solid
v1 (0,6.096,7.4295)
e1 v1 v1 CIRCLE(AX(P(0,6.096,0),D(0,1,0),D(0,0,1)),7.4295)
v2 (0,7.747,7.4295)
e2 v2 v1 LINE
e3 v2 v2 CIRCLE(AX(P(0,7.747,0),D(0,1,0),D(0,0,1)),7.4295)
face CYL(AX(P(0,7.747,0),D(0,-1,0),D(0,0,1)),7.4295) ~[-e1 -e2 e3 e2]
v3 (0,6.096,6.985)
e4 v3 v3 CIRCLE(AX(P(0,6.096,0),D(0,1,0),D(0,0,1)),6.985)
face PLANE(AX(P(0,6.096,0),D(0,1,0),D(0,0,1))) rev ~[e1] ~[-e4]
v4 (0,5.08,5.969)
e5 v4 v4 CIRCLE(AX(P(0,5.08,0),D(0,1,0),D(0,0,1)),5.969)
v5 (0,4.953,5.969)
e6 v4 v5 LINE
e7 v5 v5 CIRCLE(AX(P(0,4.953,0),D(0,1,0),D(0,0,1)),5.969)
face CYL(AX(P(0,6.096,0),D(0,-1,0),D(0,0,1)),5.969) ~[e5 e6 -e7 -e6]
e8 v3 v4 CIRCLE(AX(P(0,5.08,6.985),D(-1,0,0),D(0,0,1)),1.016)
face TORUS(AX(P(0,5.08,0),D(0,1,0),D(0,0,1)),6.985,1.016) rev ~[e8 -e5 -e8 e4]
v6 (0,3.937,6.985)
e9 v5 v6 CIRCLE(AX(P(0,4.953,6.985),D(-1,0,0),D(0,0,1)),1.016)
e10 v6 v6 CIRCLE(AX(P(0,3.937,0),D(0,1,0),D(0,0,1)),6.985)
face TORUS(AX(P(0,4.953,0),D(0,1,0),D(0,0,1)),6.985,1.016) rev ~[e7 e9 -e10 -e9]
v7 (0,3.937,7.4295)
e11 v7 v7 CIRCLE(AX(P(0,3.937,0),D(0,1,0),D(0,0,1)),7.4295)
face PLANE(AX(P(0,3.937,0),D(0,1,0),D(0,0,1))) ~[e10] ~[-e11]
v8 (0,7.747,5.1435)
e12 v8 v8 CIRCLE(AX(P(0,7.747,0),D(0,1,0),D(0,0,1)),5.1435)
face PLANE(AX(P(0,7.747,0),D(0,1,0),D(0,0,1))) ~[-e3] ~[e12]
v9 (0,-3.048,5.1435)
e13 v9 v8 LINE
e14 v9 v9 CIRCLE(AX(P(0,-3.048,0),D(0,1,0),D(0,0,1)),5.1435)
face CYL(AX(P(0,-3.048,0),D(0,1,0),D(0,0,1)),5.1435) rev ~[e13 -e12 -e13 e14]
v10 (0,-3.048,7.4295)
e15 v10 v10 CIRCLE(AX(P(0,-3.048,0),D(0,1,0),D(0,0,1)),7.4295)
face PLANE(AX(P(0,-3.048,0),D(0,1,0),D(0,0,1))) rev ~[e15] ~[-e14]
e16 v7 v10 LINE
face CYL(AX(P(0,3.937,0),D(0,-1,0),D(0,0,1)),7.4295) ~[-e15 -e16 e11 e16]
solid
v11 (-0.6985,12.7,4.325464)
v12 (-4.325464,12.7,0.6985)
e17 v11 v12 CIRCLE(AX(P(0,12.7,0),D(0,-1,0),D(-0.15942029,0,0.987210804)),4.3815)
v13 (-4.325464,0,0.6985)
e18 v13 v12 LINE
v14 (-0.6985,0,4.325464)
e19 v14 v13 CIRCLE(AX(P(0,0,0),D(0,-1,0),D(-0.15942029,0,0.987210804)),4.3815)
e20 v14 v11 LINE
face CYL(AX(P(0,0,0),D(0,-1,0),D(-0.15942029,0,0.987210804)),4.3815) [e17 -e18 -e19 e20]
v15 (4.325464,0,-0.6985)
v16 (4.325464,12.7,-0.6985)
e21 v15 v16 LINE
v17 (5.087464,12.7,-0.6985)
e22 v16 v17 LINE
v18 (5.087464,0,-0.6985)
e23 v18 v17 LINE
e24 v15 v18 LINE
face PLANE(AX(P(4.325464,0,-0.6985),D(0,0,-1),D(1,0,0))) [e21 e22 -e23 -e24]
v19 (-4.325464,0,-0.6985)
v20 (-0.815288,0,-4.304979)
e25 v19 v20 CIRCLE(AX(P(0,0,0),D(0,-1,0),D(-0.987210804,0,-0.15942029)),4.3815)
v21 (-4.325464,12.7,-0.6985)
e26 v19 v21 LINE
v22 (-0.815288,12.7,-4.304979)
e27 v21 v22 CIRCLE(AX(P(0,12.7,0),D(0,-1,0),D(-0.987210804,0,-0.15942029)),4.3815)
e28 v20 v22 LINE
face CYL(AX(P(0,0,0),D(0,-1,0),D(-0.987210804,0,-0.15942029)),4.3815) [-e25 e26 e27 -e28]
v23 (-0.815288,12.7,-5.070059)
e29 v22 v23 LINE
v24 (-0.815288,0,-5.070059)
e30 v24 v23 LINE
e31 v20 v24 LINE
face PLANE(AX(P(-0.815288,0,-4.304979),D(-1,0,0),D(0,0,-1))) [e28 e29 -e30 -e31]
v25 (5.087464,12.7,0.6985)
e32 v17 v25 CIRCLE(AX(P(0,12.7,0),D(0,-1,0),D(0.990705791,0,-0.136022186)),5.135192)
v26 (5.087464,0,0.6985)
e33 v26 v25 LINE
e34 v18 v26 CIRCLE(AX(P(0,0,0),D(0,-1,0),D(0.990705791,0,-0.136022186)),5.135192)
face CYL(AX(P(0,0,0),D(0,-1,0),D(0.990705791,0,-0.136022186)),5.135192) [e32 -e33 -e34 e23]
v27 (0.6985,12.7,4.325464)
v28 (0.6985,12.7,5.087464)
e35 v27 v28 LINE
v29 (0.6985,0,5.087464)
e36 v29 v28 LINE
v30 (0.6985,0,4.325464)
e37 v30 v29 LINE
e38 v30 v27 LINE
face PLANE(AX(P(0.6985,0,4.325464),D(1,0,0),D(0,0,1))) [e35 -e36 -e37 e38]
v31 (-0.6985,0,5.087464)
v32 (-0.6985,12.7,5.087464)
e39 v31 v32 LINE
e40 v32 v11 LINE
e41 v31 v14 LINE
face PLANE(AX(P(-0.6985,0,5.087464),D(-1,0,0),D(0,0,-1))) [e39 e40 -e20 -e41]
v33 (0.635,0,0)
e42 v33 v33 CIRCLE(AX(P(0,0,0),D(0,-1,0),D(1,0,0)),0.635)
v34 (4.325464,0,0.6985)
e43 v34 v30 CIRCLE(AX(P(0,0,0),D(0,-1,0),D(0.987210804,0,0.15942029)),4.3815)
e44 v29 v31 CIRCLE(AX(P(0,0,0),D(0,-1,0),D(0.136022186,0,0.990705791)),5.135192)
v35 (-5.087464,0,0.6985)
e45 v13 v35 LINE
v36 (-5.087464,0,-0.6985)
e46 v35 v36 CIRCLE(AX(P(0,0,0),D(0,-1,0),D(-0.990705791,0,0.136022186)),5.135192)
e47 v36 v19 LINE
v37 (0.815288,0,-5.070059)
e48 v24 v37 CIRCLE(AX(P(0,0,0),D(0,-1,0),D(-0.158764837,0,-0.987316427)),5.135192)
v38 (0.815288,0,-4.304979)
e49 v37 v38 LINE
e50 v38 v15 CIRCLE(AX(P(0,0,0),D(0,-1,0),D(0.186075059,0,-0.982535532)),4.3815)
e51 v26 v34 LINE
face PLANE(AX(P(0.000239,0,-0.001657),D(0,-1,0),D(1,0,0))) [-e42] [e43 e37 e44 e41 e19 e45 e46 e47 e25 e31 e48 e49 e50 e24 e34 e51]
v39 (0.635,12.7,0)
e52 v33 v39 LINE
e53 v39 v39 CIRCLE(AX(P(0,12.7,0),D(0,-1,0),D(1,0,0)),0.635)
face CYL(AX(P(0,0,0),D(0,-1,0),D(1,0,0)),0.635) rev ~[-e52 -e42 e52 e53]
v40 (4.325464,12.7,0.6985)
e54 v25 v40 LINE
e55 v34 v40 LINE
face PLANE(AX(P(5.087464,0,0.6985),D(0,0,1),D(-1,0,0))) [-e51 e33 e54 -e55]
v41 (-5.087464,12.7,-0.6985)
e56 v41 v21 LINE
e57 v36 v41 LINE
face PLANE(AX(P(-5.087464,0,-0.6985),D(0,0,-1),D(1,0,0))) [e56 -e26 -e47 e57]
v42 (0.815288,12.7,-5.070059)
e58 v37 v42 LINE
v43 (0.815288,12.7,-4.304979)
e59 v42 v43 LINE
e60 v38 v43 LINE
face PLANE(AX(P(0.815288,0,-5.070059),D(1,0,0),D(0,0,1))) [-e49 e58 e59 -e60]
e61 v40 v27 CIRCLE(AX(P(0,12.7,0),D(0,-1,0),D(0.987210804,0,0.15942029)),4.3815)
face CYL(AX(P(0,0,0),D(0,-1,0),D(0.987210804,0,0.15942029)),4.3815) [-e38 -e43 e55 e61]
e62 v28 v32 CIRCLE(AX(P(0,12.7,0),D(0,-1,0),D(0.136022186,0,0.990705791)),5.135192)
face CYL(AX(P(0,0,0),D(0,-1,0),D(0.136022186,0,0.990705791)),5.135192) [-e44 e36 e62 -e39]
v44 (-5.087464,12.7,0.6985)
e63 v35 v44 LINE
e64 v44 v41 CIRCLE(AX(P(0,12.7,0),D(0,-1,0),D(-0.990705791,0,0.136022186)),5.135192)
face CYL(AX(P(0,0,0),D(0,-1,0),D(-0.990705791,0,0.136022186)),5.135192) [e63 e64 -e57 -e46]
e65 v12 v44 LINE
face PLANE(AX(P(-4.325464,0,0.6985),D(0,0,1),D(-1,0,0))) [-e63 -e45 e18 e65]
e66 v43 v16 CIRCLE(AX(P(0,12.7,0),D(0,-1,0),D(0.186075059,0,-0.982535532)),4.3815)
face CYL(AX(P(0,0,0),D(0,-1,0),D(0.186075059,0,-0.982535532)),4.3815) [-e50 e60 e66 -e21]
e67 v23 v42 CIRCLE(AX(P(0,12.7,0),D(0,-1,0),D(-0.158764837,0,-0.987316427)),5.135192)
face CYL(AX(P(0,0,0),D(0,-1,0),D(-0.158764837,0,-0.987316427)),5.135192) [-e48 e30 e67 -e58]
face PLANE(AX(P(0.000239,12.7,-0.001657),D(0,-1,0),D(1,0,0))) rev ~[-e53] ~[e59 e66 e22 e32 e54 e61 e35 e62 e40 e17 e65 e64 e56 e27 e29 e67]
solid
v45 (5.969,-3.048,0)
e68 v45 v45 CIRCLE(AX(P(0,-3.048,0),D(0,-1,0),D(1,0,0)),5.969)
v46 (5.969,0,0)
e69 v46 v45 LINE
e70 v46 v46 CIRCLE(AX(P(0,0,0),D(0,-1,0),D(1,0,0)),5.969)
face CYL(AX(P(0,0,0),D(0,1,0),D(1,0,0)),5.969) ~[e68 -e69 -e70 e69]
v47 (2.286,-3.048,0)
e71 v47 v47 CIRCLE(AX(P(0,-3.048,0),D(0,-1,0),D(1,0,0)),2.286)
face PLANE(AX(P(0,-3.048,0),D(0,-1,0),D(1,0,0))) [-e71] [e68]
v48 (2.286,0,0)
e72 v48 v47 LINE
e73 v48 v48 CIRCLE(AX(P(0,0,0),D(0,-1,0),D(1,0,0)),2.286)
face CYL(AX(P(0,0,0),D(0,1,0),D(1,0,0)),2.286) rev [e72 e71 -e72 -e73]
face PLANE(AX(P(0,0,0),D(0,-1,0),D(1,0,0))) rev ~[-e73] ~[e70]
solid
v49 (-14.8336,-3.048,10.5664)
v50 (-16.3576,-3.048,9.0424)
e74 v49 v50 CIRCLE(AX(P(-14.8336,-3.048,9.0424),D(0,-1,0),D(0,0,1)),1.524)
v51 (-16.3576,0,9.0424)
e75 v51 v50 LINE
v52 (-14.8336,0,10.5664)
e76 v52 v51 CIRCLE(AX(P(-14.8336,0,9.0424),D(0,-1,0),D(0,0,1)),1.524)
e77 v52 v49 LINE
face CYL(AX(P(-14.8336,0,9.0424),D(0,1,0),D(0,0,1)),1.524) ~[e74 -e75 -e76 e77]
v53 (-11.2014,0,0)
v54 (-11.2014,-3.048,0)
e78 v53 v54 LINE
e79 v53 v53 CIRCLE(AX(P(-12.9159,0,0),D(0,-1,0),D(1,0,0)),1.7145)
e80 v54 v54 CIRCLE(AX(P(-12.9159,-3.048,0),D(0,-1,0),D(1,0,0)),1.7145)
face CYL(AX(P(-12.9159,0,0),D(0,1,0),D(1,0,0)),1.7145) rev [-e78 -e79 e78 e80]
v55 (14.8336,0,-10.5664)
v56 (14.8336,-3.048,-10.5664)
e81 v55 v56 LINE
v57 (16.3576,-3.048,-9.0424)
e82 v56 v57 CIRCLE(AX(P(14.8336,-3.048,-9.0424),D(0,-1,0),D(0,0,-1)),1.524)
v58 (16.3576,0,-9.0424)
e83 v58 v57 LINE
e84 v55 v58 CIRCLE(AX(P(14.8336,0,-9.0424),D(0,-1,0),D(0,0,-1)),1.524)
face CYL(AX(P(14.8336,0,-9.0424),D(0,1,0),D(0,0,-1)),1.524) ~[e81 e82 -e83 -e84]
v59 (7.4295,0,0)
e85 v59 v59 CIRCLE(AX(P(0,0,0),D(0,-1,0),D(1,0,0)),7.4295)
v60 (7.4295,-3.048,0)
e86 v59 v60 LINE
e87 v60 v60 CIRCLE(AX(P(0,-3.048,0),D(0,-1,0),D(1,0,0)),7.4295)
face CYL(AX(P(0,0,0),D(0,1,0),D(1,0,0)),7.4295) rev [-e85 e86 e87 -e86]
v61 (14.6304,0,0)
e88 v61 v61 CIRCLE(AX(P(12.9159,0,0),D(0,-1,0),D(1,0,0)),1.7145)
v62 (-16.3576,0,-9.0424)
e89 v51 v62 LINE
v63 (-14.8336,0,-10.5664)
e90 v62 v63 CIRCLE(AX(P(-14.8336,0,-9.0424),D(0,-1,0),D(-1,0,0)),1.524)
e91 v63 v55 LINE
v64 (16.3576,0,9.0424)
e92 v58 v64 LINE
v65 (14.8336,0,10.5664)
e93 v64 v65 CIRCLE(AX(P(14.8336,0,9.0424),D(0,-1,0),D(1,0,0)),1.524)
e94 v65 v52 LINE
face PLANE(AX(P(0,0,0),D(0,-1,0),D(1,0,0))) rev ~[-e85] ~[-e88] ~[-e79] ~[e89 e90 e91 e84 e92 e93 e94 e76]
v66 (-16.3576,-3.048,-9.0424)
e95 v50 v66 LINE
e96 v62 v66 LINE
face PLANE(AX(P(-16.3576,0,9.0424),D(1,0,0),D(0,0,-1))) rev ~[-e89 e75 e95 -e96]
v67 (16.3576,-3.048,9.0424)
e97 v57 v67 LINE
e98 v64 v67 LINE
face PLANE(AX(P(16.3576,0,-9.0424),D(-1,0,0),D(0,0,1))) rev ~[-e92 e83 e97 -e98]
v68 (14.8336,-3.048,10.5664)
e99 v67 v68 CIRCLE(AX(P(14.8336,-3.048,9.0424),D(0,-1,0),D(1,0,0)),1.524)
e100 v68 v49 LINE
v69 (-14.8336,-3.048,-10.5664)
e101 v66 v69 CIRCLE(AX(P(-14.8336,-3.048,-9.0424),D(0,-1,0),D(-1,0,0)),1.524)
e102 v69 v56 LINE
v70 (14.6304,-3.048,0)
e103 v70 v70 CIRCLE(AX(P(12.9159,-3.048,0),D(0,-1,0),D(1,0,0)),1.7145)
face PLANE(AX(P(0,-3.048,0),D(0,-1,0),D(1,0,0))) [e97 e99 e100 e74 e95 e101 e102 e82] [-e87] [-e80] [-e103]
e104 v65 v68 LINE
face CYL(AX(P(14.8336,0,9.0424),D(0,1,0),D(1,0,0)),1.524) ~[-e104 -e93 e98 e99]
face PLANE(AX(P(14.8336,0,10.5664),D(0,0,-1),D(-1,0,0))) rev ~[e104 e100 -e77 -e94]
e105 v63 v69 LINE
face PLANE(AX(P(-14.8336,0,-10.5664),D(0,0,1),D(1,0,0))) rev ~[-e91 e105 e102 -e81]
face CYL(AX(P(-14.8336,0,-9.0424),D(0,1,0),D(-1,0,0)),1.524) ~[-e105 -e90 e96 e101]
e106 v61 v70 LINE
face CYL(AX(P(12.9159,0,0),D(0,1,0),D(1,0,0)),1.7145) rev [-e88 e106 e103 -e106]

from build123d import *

# Parameters (mm, degrees)
F0_R     = 1.7145
F0_R_2   = 7.4295
F1_DEPTH = 3.048
F0_R_3   = 2.286
F0_R_4   = 2.032
F0_R_5   = 0.635
F2_DEPTH = 12.7
F0_R_6   = 5.969
F3_DEPTH = 3.048
F6_R     = 1.016


# Not quite as in the source:
# - a feature of the source that left no trace in its solid (it failed there, or was rolled back) is left out
# - a feature names something its author has since deleted; it is built from what else it names
# - the program builds the solid bodies; features that only make, move or delete a surface that nothing else refers to are left out


with BuildPart() as f1:
    # F0 (on Front) → F1 (new body)
    with BuildSketch(Plane.XZ):
        with BuildLine():
            ThreePointArc((16.3576, 9.0424), (15.9112307345, 10.1200307345), (14.8336, 10.5664))
            Line((14.8336, 10.5664), (-14.8336, 10.5664))
            ThreePointArc((-14.8336, 10.5664), (-15.9112307345, 10.1200307345), (-16.3576, 9.0424))
            Line((-16.3576, 9.0424), (-16.3576, -9.0424))
            ThreePointArc((-16.3576, -9.0424), (-15.9112307345, -10.1200307345), (-14.8336, -10.5664))
            Line((-14.8336, -10.5664), (14.8336, -10.5664))
            ThreePointArc((14.8336, -10.5664), (15.9112307345, -10.1200307345), (16.3576, -9.0424))
            Line((16.3576, -9.0424), (16.3576, 9.0424))
        make_face()
        with Locations((-12.9159, 0)):
            Circle(F0_R, mode=Mode.SUBTRACT)
        Circle(F0_R_2, mode=Mode.SUBTRACT)
        with Locations((12.9159, 0)):
            Circle(F0_R, mode=Mode.SUBTRACT)
    extrude(amount=F1_DEPTH)


with BuildPart() as f2:
    # F0 (on Front) → F2 (new body)
    with BuildSketch(Plane.XZ):
        with BuildLine():
            ThreePointArc((4.3254641369, -0.6985), (4.3674685669, -0.3503720408), (4.3815, 0))
            ThreePointArc((4.3815, 0), (4.3674685669, 0.3503720408), (4.3254641369, 0.6985))
            ThreePointArc((4.3254641369, 0.6985), (3.0981883618, 3.0981883618), (0.6985, 4.3254641369))
            ThreePointArc((0.6985, 4.3254641369), (0, 4.3815), (-0.6985, 4.3254641369))
            ThreePointArc((-0.6985, 4.3254641369), (-3.0981883618, 3.0981883618), (-4.3254641369, 0.6985))
            ThreePointArc((-4.3254641369, 0.6985), (-4.3815, 0), (-4.3254641369, -0.6985))
            ThreePointArc((-4.3254641369, -0.6985), (-3.139825836, -3.0559836338), (-0.8152878707, -4.3049794352))
            ThreePointArc((-0.8152878707, -4.3049794352), (0, -4.3815), (0.8152878707, -4.3049794352))
            ThreePointArc((0.8152878707, -4.3049794352), (3.139825836, -3.0559836338), (4.3254641369, -0.6985))
        make_face()
        Circle(F0_R_3, mode=Mode.SUBTRACT)
        Circle(F0_R_3)
        Circle(F0_R_4, mode=Mode.SUBTRACT)
        Circle(F0_R_4)
        Circle(F0_R_5, mode=Mode.SUBTRACT)
        with BuildLine():
            Line((0.8152878707, -5.0700591005), (0.8152878707, -4.3049794352))
            ThreePointArc((0.8152878707, -4.3049794352), (0, -4.3815), (-0.8152878707, -4.3049794352))
            Line((-0.8152878707, -4.3049794352), (-0.8152878707, -5.0700591005))
            ThreePointArc((-0.8152878707, -5.0700591005), (0, -5.1351916804), (0.8152878707, -5.0700591005))
        make_face()
        with BuildLine():
            ThreePointArc((4.3254641369, 0.6985), (4.3674685669, 0.3503720408), (4.3815, 0))
            ThreePointArc((4.3815, 0), (4.3674685669, -0.3503720408), (4.3254641369, -0.6985))
            Line((4.3254641369, -0.6985), (5.0874641369, -0.6985))
            ThreePointArc((5.0874641369, -0.6985), (5.1351916804, 0), (5.0874641369, 0.6985))
            Line((5.0874641369, 0.6985), (4.3254641369, 0.6985))
        make_face()
        with BuildLine():
            ThreePointArc((-0.6985, 4.3254641369), (0, 4.3815), (0.6985, 4.3254641369))
            Line((0.6985, 4.3254641369), (0.6985, 5.0874641369))
            ThreePointArc((0.6985, 5.0874641369), (0, 5.1351916804), (-0.6985, 5.0874641369))
            Line((-0.6985, 5.0874641369), (-0.6985, 4.3254641369))
        make_face()
        with BuildLine():
            ThreePointArc((-4.3254641369, -0.6985), (-4.3815, 0), (-4.3254641369, 0.6985))
            Line((-4.3254641369, 0.6985), (-5.0874641369, 0.6985))
            ThreePointArc((-5.0874641369, 0.6985), (-5.1351916804, 0), (-5.0874641369, -0.6985))
            Line((-5.0874641369, -0.6985), (-4.3254641369, -0.6985))
        make_face()
    extrude(amount=-F2_DEPTH)


with BuildPart() as f3:
    # F0 (on Front) → F3 (new body)
    with BuildSketch(Plane.XZ):
        Circle(F0_R_6)
        with BuildLine():
            ThreePointArc((0.6985, 5.0874641369), (3.6311288599, 3.6311288599), (5.0874641369, 0.6985))
            ThreePointArc((5.0874641369, 0.6985), (5.1351916804, 0), (5.0874641369, -0.6985))
            ThreePointArc((5.0874641369, -0.6985), (3.6726356419, -3.5891421031), (0.8152878707, -5.0700591005))
            ThreePointArc((0.8152878707, -5.0700591005), (0, -5.1351916804), (-0.8152878707, -5.0700591005))
            ThreePointArc((-0.8152878707, -5.0700591005), (-3.6726356419, -3.5891421031), (-5.0874641369, -0.6985))
            ThreePointArc((-5.0874641369, -0.6985), (-5.1351916804, 0), (-5.0874641369, 0.6985))
            ThreePointArc((-5.0874641369, 0.6985), (-3.6311288599, 3.6311288599), (-0.6985, 5.0874641369))
            ThreePointArc((-0.6985, 5.0874641369), (0, 5.1351916804), (0.6985, 5.0874641369))
        make_face(mode=Mode.SUBTRACT)
        with BuildLine():
            ThreePointArc((4.3254641369, -0.6985), (4.3674685669, -0.3503720408), (4.3815, 0))
            ThreePointArc((4.3815, 0), (4.3674685669, 0.3503720408), (4.3254641369, 0.6985))
            ThreePointArc((4.3254641369, 0.6985), (3.0981883618, 3.0981883618), (0.6985, 4.3254641369))
            ThreePointArc((0.6985, 4.3254641369), (0, 4.3815), (-0.6985, 4.3254641369))
            ThreePointArc((-0.6985, 4.3254641369), (-3.0981883618, 3.0981883618), (-4.3254641369, 0.6985))
            ThreePointArc((-4.3254641369, 0.6985), (-4.3815, 0), (-4.3254641369, -0.6985))
            ThreePointArc((-4.3254641369, -0.6985), (-3.139825836, -3.0559836338), (-0.8152878707, -4.3049794352))
            ThreePointArc((-0.8152878707, -4.3049794352), (0, -4.3815), (0.8152878707, -4.3049794352))
            ThreePointArc((0.8152878707, -4.3049794352), (3.139825836, -3.0559836338), (4.3254641369, -0.6985))
        make_face()
        Circle(F0_R_3, mode=Mode.SUBTRACT)
        with BuildLine():
            ThreePointArc((0.6985, 4.3254641369), (3.0981883618, 3.0981883618), (4.3254641369, 0.6985))
            Line((4.3254641369, 0.6985), (5.0874641369, 0.6985))
            ThreePointArc((5.0874641369, 0.6985), (3.6311288599, 3.6311288599), (0.6985, 5.0874641369))
            Line((0.6985, 5.0874641369), (0.6985, 4.3254641369))
        make_face()
        with BuildLine():
            ThreePointArc((-4.3254641369, 0.6985), (-3.0981883618, 3.0981883618), (-0.6985, 4.3254641369))
            Line((-0.6985, 4.3254641369), (-0.6985, 5.0874641369))
            ThreePointArc((-0.6985, 5.0874641369), (-3.6311288599, 3.6311288599), (-5.0874641369, 0.6985))
            Line((-5.0874641369, 0.6985), (-4.3254641369, 0.6985))
        make_face()
        with BuildLine():
            Line((5.0874641369, -0.6985), (4.3254641369, -0.6985))
            ThreePointArc((4.3254641369, -0.6985), (3.139825836, -3.0559836338), (0.8152878707, -4.3049794352))
            Line((0.8152878707, -4.3049794352), (0.8152878707, -5.0700591005))
            ThreePointArc((0.8152878707, -5.0700591005), (3.6726356419, -3.5891421031), (5.0874641369, -0.6985))
        make_face()
        with BuildLine():
            Line((-0.8152878707, -5.0700591005), (-0.8152878707, -4.3049794352))
            ThreePointArc((-0.8152878707, -4.3049794352), (-3.139825836, -3.0559836338), (-4.3254641369, -0.6985))
            Line((-4.3254641369, -0.6985), (-5.0874641369, -0.6985))
            ThreePointArc((-5.0874641369, -0.6985), (-3.6726356419, -3.5891421031), (-0.8152878707, -5.0700591005))
        make_face()
        with BuildLine():
            Line((0.8152878707, -5.0700591005), (0.8152878707, -4.3049794352))
            ThreePointArc((0.8152878707, -4.3049794352), (0, -4.3815), (-0.8152878707, -4.3049794352))
            Line((-0.8152878707, -4.3049794352), (-0.8152878707, -5.0700591005))
            ThreePointArc((-0.8152878707, -5.0700591005), (0, -5.1351916804), (0.8152878707, -5.0700591005))
        make_face()
        with BuildLine():
            ThreePointArc((4.3254641369, 0.6985), (4.3674685669, 0.3503720408), (4.3815, 0))
            ThreePointArc((4.3815, 0), (4.3674685669, -0.3503720408), (4.3254641369, -0.6985))
            Line((4.3254641369, -0.6985), (5.0874641369, -0.6985))
            ThreePointArc((5.0874641369, -0.6985), (5.1351916804, 0), (5.0874641369, 0.6985))
            Line((5.0874641369, 0.6985), (4.3254641369, 0.6985))
        make_face()
        with BuildLine():
            ThreePointArc((-4.3254641369, -0.6985), (-4.3815, 0), (-4.3254641369, 0.6985))
            Line((-4.3254641369, 0.6985), (-5.0874641369, 0.6985))
            ThreePointArc((-5.0874641369, 0.6985), (-5.1351916804, 0), (-5.0874641369, -0.6985))
            Line((-5.0874641369, -0.6985), (-4.3254641369, -0.6985))
        make_face()
        with BuildLine():
            ThreePointArc((-0.6985, 4.3254641369), (0, 4.3815), (0.6985, 4.3254641369))
            Line((0.6985, 4.3254641369), (0.6985, 5.0874641369))
            ThreePointArc((0.6985, 5.0874641369), (0, 5.1351916804), (-0.6985, 5.0874641369))
            Line((-0.6985, 5.0874641369), (-0.6985, 4.3254641369))
        make_face()
    extrude(amount=F3_DEPTH)


with BuildPart() as f5:
    # F4 (on Right) → F5 (revolve)
    with BuildSketch(Plane.YZ):
        Polygon((-3.048, 7.4295), (-3.048, 5.1435), (7.747, 5.1435), (7.747, 7.4295), (6.096, 7.4295), (6.096, 5.969), (3.937, 5.969), (3.937, 7.4295), align=None)
    revolve(axis=Axis((0, 9.7803371027, 0), (0, 1, 0)))

    # F6
    f6_edges = [f5.edges().sort_by_distance(p)[0] for p in [
        (0, 6.096, -5.969),
        (0, 3.937, -5.969),
    ]]
    fillet(f6_edges, radius=F6_R)


solid = Compound([f1.part, f2.part, f3.part, f5.part])
